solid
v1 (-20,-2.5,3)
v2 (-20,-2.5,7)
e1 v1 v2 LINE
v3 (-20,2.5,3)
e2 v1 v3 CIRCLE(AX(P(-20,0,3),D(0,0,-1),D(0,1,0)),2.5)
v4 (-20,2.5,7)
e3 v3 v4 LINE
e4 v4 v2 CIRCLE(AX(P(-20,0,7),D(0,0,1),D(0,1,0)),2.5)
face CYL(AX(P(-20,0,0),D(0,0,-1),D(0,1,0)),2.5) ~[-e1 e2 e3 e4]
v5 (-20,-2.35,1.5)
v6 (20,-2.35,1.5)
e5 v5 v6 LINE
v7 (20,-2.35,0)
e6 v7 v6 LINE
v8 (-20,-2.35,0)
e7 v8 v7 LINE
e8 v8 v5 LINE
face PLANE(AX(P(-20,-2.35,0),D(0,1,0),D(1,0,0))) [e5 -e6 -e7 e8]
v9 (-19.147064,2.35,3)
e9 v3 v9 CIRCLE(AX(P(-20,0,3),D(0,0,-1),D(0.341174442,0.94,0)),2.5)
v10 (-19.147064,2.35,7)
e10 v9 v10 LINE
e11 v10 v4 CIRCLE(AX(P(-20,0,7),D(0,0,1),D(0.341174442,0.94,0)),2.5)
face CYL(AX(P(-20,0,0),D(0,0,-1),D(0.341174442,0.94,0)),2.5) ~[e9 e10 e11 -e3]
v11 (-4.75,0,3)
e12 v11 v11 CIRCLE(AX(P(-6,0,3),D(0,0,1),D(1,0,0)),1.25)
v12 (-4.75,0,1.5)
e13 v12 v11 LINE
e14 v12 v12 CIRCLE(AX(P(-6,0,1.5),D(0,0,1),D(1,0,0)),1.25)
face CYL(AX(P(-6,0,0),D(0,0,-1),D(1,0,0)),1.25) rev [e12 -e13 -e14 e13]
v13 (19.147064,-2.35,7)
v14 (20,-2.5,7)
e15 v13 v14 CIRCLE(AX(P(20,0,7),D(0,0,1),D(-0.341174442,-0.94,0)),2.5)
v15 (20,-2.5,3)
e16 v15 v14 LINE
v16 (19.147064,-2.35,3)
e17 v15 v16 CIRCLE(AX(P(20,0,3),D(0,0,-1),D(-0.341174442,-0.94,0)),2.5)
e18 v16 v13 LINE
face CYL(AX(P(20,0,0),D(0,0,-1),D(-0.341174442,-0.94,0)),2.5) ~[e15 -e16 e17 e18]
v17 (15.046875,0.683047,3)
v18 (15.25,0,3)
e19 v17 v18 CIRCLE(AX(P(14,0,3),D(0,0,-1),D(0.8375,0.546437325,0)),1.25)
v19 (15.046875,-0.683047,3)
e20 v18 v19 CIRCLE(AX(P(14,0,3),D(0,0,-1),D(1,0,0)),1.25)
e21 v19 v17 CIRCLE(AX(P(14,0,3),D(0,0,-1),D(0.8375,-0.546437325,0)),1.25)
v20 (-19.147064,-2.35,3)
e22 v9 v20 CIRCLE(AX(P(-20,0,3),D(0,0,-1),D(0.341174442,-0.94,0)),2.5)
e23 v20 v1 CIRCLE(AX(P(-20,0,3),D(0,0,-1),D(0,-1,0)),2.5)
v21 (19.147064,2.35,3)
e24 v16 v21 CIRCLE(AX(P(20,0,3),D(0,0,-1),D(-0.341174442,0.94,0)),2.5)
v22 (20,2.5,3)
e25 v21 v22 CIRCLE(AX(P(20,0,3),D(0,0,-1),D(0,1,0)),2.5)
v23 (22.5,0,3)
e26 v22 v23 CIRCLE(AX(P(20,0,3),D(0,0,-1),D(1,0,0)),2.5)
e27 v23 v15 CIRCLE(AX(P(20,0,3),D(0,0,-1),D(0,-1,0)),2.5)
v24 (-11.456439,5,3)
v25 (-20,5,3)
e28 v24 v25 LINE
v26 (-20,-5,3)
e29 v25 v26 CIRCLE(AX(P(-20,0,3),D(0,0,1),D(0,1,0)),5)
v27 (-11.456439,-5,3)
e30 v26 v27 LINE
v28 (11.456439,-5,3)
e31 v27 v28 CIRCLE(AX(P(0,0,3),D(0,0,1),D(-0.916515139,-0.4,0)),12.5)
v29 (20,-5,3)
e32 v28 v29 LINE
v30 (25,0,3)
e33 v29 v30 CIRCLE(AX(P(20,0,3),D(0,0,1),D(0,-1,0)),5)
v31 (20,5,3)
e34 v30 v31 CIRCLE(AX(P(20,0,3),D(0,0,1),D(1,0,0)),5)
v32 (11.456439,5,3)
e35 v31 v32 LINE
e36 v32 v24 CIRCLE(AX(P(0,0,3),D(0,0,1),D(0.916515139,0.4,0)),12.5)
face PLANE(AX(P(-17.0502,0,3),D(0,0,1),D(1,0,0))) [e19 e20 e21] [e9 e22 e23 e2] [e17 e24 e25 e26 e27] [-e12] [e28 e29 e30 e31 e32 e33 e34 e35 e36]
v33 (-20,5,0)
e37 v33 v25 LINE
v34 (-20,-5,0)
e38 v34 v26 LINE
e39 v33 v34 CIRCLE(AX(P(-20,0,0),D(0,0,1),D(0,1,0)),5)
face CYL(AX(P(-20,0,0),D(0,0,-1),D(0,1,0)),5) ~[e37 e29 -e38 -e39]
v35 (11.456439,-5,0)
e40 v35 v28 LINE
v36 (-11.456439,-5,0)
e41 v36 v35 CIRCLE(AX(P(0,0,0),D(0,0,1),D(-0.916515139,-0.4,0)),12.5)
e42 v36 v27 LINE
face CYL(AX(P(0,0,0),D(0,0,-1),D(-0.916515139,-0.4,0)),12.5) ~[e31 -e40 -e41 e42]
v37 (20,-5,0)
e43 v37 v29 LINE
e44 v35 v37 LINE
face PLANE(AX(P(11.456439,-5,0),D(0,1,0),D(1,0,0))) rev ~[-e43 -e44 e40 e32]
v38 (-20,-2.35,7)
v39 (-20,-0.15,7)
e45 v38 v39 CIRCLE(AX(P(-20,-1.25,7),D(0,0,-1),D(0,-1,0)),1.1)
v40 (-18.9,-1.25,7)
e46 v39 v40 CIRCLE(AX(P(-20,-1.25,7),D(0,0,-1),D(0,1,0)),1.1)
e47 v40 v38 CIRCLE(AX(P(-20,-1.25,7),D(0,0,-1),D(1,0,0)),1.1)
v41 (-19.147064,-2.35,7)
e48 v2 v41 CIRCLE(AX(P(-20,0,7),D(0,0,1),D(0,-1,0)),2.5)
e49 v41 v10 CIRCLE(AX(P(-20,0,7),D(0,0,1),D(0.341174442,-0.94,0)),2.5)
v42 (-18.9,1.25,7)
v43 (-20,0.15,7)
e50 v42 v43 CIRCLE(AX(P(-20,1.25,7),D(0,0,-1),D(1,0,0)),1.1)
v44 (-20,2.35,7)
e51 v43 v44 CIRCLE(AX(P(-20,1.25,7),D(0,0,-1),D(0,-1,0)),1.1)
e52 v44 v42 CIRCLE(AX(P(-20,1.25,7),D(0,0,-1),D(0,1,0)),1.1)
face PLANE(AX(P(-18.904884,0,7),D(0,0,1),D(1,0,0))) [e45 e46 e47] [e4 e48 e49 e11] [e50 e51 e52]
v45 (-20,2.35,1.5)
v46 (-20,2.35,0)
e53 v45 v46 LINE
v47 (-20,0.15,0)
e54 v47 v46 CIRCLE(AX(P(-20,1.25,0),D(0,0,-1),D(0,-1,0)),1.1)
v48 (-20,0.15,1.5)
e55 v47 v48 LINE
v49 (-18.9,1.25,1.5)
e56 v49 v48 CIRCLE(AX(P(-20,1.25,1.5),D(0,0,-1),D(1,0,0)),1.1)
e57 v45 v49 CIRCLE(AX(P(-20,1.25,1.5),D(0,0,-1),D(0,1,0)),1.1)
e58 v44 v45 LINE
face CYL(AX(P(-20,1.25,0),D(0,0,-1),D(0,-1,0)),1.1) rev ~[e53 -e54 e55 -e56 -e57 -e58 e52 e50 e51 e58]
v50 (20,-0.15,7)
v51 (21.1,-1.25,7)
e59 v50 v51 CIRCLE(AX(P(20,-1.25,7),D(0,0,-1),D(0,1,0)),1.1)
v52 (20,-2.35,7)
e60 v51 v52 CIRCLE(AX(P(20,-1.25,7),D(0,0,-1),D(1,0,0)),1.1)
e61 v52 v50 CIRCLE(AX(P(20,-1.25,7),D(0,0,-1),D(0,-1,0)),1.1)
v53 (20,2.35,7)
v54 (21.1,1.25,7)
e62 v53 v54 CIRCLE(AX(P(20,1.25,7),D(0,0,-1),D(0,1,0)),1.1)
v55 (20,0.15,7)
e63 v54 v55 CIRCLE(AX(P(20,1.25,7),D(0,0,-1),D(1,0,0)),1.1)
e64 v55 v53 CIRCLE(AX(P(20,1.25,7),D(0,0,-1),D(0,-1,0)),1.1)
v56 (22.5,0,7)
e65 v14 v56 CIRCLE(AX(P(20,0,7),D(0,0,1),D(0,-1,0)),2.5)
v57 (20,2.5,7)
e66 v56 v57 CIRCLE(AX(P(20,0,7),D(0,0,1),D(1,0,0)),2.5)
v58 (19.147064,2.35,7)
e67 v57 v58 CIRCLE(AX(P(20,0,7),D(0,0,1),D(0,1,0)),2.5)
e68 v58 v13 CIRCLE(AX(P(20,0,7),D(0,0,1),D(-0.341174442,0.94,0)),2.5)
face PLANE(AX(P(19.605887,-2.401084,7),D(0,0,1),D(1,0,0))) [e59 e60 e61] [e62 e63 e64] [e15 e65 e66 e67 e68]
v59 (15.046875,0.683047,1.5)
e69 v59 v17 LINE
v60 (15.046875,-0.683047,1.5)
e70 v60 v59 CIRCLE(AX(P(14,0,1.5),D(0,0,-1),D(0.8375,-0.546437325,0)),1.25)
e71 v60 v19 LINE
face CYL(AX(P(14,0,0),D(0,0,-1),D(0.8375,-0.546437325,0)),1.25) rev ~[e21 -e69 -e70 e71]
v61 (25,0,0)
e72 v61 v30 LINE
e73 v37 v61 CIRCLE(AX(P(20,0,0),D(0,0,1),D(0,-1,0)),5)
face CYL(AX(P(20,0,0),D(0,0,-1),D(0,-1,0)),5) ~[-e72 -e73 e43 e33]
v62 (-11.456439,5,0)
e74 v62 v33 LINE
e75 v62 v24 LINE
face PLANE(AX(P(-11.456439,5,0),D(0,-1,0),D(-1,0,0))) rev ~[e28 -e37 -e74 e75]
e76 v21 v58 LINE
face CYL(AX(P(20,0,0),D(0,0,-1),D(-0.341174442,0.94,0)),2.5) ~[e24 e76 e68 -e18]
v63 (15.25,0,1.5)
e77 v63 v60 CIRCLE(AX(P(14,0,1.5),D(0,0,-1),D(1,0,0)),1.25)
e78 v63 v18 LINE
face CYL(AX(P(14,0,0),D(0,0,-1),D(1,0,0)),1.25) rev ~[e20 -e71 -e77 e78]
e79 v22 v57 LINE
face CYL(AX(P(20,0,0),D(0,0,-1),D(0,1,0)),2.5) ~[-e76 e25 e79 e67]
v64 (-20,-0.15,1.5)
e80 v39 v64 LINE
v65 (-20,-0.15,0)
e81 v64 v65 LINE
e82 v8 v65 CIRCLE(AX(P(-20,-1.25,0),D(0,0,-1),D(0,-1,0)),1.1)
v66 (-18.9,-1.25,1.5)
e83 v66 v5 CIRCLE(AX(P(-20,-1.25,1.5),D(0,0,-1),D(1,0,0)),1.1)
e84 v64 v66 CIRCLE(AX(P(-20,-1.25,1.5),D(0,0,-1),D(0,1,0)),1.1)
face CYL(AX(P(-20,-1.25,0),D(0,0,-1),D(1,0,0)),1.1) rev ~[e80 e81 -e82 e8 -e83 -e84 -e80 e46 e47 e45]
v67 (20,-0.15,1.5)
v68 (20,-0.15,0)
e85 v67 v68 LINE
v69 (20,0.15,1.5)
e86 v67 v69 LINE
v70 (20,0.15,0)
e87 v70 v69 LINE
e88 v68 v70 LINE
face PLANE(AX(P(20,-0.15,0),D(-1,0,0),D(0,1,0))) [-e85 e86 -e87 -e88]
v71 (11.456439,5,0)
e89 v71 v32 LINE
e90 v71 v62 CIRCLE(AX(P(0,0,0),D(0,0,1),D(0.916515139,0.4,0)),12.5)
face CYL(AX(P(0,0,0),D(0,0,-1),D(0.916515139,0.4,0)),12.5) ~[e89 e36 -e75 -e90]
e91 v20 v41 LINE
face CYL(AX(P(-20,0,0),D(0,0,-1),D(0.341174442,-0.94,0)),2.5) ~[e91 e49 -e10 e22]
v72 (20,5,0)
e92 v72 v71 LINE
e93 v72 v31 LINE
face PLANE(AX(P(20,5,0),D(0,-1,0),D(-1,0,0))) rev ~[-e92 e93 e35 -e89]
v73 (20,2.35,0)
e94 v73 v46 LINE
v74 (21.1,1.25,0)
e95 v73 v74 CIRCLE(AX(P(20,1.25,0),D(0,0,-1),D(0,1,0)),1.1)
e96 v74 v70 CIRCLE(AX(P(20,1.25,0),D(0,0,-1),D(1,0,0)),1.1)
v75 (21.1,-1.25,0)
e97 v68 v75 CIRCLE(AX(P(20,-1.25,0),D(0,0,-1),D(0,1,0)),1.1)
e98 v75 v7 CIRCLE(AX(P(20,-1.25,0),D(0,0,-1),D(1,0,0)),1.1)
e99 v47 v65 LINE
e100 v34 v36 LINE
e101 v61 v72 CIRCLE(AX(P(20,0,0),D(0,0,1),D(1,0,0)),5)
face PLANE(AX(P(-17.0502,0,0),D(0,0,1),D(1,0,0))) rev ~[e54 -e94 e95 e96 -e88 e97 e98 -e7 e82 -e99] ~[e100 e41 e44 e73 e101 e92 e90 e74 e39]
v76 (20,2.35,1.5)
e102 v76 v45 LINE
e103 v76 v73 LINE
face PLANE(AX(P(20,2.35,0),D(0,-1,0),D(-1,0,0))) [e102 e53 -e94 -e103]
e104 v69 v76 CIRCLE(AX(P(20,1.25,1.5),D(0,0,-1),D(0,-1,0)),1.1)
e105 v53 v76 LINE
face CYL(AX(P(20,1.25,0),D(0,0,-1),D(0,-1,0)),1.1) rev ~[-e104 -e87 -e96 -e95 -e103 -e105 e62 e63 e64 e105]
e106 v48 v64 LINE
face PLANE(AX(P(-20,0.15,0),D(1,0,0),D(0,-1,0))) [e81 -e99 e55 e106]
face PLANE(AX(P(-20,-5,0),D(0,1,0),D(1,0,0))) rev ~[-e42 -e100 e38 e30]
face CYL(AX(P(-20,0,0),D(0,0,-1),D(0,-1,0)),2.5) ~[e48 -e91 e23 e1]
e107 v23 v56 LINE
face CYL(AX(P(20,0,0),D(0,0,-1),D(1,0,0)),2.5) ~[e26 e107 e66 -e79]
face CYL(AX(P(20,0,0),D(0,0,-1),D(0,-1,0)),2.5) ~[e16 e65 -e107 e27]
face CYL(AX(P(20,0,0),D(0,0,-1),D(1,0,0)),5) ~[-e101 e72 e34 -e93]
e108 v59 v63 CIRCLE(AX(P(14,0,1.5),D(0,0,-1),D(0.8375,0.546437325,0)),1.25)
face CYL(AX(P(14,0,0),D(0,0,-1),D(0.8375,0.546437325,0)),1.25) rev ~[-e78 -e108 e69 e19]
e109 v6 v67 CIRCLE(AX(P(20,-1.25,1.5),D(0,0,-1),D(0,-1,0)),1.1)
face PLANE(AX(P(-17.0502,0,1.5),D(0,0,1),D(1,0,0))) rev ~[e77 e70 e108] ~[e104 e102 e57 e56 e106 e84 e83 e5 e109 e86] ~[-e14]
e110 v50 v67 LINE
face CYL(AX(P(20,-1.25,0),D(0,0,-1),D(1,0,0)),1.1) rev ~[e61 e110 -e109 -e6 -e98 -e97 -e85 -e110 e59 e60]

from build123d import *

# Parameters (mm, degrees)
F0_R     = 1.25
F1_DEPTH = 3
F2_DEPTH = 7
F3_DEPTH = 1.5


# Not quite as in the source:
# - a feature names something its author has since deleted; it is built from what else it names


with BuildPart() as f1:
    # F0 (on Top) → F1 (new body)
    with BuildSketch(Plane.XY):
        with BuildLine():
            ThreePointArc((-15, 0), (-15.1488836144, 1.2110614409), (-15.5866679255, 2.35))
            Line((-15.5866679255, 2.35), (-19.1470638945, 2.35))
            ThreePointArc((-19.1470638945, 2.35), (-17.9527652475, 1.4348623168), (-17.5, 0))
            ThreePointArc((-17.5, 0), (-17.9527652475, -1.4348623168), (-19.1470638945, -2.35))
            Line((-19.1470638945, -2.35), (-15.5866679255, -2.35))
            ThreePointArc((-15.5866679255, -2.35), (-15.1488836144, -1.2110614409), (-15, 0))
        make_face()
        with BuildLine():
            Line((-20, -2.5), (-20, -5))
            ThreePointArc((-20, -5), (-17.4260924648, -4.2866070499), (-15.5866679255, -2.35))
            Line((-15.5866679255, -2.35), (-19.1470638945, -2.35))
            ThreePointArc((-19.1470638945, -2.35), (-19.5669872981, -2.4622144504), (-20, -2.5))
        make_face()
        with BuildLine():
            ThreePointArc((-15.5866679255, 2.35), (-17.4260924648, 4.2866070499), (-20, 5))
            Line((-20, 5), (-20, 2.5))
            ThreePointArc((-20, 2.5), (-19.5669872981, 2.4622144504), (-19.1470638945, 2.35))
            Line((-19.1470638945, 2.35), (-15.5866679255, 2.35))
        make_face()
        with BuildLine():
            Line((-20, 2.35), (-20, 2.5))
            ThreePointArc((-20, 2.5), (-22.5, 0), (-20, -2.5))
            Line((-20, -2.5), (-20, -2.35))
            ThreePointArc((-20, -2.35), (-21.1, -1.25), (-20, -0.15))
            Line((-20, -0.15), (-20, 0.15))
            ThreePointArc((-20, 0.15), (-21.1, 1.25), (-20, 2.35))
        make_face()
        with BuildLine():
            ThreePointArc((-12.2771128528, 2.35), (-11.9405191974, 3.6978373809), (-11.4564392374, 5))
            Line((-11.4564392374, 5), (-20, 5))
            ThreePointArc((-20, 5), (-17.4260924648, 4.2866070499), (-15.5866679255, 2.35))
            Line((-15.5866679255, 2.35), (-12.2771128528, 2.35))
        make_face()
        with BuildLine():
            ThreePointArc((-11.4564392374, -5), (-11.9405191974, -3.6978373809), (-12.2771128528, -2.35))
            Line((-12.2771128528, -2.35), (-15.5866679255, -2.35))
            ThreePointArc((-15.5866679255, -2.35), (-17.4260924648, -4.2866070499), (-20, -5))
            Line((-20, -5), (-11.4564392374, -5))
        make_face()
        with BuildLine():
            ThreePointArc((-12.2771128528, -2.35), (-12.5, 0), (-12.2771128528, 2.35))
            Line((-12.2771128528, 2.35), (-15.5866679255, 2.35))
            ThreePointArc((-15.5866679255, 2.35), (-15.1488836144, 1.2110614409), (-15, 0))
            ThreePointArc((-15, 0), (-15.1488836144, -1.2110614409), (-15.5866679255, -2.35))
            Line((-15.5866679255, -2.35), (-12.2771128528, -2.35))
        make_face()
        with BuildLine():
            Line((-11.4564392374, 2.35), (-11.4564392374, 5))
            ThreePointArc((-11.4564392374, 5), (-11.9405191974, 3.6978373809), (-12.2771128528, 2.35))
            Line((-12.2771128528, 2.35), (-11.4564392374, 2.35))
        make_face()
        with BuildLine():
            Line((-11.4564392374, 2.35), (-12.2771128528, 2.35))
            ThreePointArc((-12.2771128528, 2.35), (-12.5, 0), (-12.2771128528, -2.35))
            Line((-12.2771128528, -2.35), (-11.4564392374, -2.35))
            Line((-11.4564392374, -2.35), (-11.4564392374, -1))
            ThreePointArc((-11.4564392374, -1), (-11.5, 0), (-11.4564392374, 1))
            Line((-11.4564392374, 1), (-11.4564392374, 2.35))
        make_face()
        with BuildLine():
            Line((-11.4564392374, -2.35), (-12.2771128528, -2.35))
            ThreePointArc((-12.2771128528, -2.35), (-11.9405191974, -3.6978373809), (-11.4564392374, -5))
            Line((-11.4564392374, -5), (-11.4564392374, -2.35))
        make_face()
        with BuildLine():
            Line((-11.2573309448, 2.35), (-11.4564392374, 2.35))
            Line((-11.4564392374, 2.35), (-11.4564392374, 1))
            ThreePointArc((-11.4564392374, 1), (-11.3769268246, 1.6779559077), (-11.2573309448, 2.35))
        make_face()
        with BuildLine():
            Line((-11.4564392374, -1), (-11.4564392374, -2.35))
            Line((-11.4564392374, -2.35), (-11.2573309448, -2.35))
            ThreePointArc((-11.2573309448, -2.35), (-11.3769268246, -1.6779559077), (-11.4564392374, -1))
        make_face()
        with BuildLine():
            Line((-11.4564392374, -2.35), (-11.4564392374, -5))
            ThreePointArc((-11.4564392374, -5), (0, -12.5), (11.4564392374, -5))
            Line((11.4564392374, -5), (11.4564392374, -2.35))
            Line((11.4564392374, -2.35), (11.2573309448, -2.35))
            ThreePointArc((11.2573309448, -2.35), (0, -11.5), (-11.2573309448, -2.35))
            Line((-11.2573309448, -2.35), (-11.4564392374, -2.35))
        make_face()
        with BuildLine():
            Line((11.4564392374, 2.35), (11.4564392374, 5))
            ThreePointArc((11.4564392374, 5), (0, 12.5), (-11.4564392374, 5))
            Line((-11.4564392374, 5), (-11.4564392374, 2.35))
            Line((-11.4564392374, 2.35), (-11.2573309448, 2.35))
            ThreePointArc((-11.2573309448, 2.35), (0, 11.5), (11.2573309448, 2.35))
            Line((11.2573309448, 2.35), (11.4564392374, 2.35))
        make_face()
        with BuildLine():
            Line((-11.2573309448, 2.35), (11.2573309448, 2.35))
            ThreePointArc((11.2573309448, 2.35), (0, 11.5), (-11.2573309448, 2.35))
        make_face()
        with BuildLine():
            ThreePointArc((-11.2573309448, -2.35), (0, -11.5), (11.2573309448, -2.35))
            Line((11.2573309448, -2.35), (-11.2573309448, -2.35))
        make_face()
        with BuildLine():
            Line((11.4564392374, -1), (11.4564392374, 1))
            ThreePointArc((11.4564392374, 1), (11.3769268246, 1.6779559077), (11.2573309448, 2.35))
            Line((11.2573309448, 2.35), (-11.2573309448, 2.35))
            ThreePointArc((-11.2573309448, 2.35), (-11.3769268246, 1.6779559077), (-11.4564392374, 1))
            Line((-11.4564392374, 1), (-11.4564392374, -1))
            ThreePointArc((-11.4564392374, -1), (-11.3769268246, -1.6779559077), (-11.2573309448, -2.35))
            Line((-11.2573309448, -2.35), (11.2573309448, -2.35))
            ThreePointArc((11.2573309448, -2.35), (11.3769268246, -1.6779559077), (11.4564392374, -1))
        make_face()
        with Locations((-6, 0)):
            Circle(F0_R, mode=Mode.SUBTRACT)
        with BuildLine():
            Line((11.4564392374, 1), (11.4564392374, 2.35))
            Line((11.4564392374, 2.35), (11.2573309448, 2.35))
            ThreePointArc((11.2573309448, 2.35), (11.3769268246, 1.6779559077), (11.4564392374, 1))
        make_face()
        with BuildLine():
            Line((11.4564392374, -2.35), (11.4564392374, -1))
            ThreePointArc((11.4564392374, -1), (11.3769268246, -1.6779559077), (11.2573309448, -2.35))
            Line((11.2573309448, -2.35), (11.4564392374, -2.35))
        make_face()
        with BuildLine():
            ThreePointArc((11.4564392374, -5), (11.9405191974, -3.6978373809), (12.2771128528, -2.35))
            Line((12.2771128528, -2.35), (11.4564392374, -2.35))
            Line((11.4564392374, -2.35), (11.4564392374, -5))
        make_face()
        with BuildLine():
            ThreePointArc((12.2771128528, 2.35), (11.9405191974, 3.6978373809), (11.4564392374, 5))
            Line((11.4564392374, 5), (11.4564392374, 2.35))
            Line((11.4564392374, 2.35), (12.2771128528, 2.35))
        make_face()
        with BuildLine():
            ThreePointArc((12.5, 0), (12.4441534598, 1.1802731337), (12.2771128528, 2.35))
            Line((12.2771128528, 2.35), (11.4564392374, 2.35))
            Line((11.4564392374, 2.35), (11.4564392374, 1))
            ThreePointArc((11.4564392374, 1), (11.4891046481, 0.5004741602), (11.5, 0))
            ThreePointArc((11.5, 0), (11.4891046481, -0.5004741602), (11.4564392374, -1))
            Line((11.4564392374, -1), (11.4564392374, -2.35))
            Line((11.4564392374, -2.35), (12.2771128528, -2.35))
            ThreePointArc((12.2771128528, -2.35), (12.4441534598, -1.1802731337), (12.5, 0))
        make_face()
        with BuildLine():
            Line((20, 5), (11.4564392374, 5))
            ThreePointArc((11.4564392374, 5), (11.9405191974, 3.6978373809), (12.2771128528, 2.35))
            Line((12.2771128528, 2.35), (15.5866679255, 2.35))
            ThreePointArc((15.5866679255, 2.35), (17.4260924648, 4.2866070499), (20, 5))
        make_face()
        with BuildLine():
            Line((15.5866679255, -2.35), (12.2771128528, -2.35))
            ThreePointArc((12.2771128528, -2.35), (11.9405191974, -3.6978373809), (11.4564392374, -5))
            Line((11.4564392374, -5), (20, -5))
            ThreePointArc((20, -5), (17.4260924648, -4.2866070499), (15.5866679255, -2.35))
        make_face()
        with BuildLine():
            Line((15.5866679255, 2.35), (12.2771128528, 2.35))
            ThreePointArc((12.2771128528, 2.35), (12.4441534598, 1.1802731337), (12.5, 0))
            ThreePointArc((12.5, 0), (12.4441534598, -1.1802731337), (12.2771128528, -2.35))
            Line((12.2771128528, -2.35), (15.5866679255, -2.35))
            ThreePointArc((15.5866679255, -2.35), (15.2431824825, -1.5403529158), (15.046875, -0.6830466561))
            ThreePointArc((15.046875, -0.6830466561), (12.75, 0), (15.046875, 0.6830466561))
            ThreePointArc((15.046875, 0.6830466561), (15.2431824825, 1.5403529158), (15.5866679255, 2.35))
        make_face()
        with BuildLine():
            Line((19.1470638945, 2.35), (15.5866679255, 2.35))
            ThreePointArc((15.5866679255, 2.35), (15.2431824825, 1.5403529158), (15.046875, 0.6830466561))
            ThreePointArc((15.046875, 0.6830466561), (15.1981430945, 0.3563048203), (15.25, 0))
            ThreePointArc((15.25, 0), (15.1981430945, -0.3563048203), (15.046875, -0.6830466561))
            ThreePointArc((15.046875, -0.6830466561), (15.2431824825, -1.5403529158), (15.5866679255, -2.35))
            Line((15.5866679255, -2.35), (19.1470638945, -2.35))
            ThreePointArc((19.1470638945, -2.35), (17.5, 0), (19.1470638945, 2.35))
        make_face()
        with BuildLine():
            Line((20, 2.5), (20, 5))
            ThreePointArc((20, 5), (17.4260924648, 4.2866070499), (15.5866679255, 2.35))
            Line((15.5866679255, 2.35), (19.1470638945, 2.35))
            ThreePointArc((19.1470638945, 2.35), (19.5669872981, 2.4622144504), (20, 2.5))
        make_face()
        with BuildLine():
            ThreePointArc((22.5, 0), (21.767766953, 1.767766953), (20, 2.5))
            Line((20, 2.5), (20, 2.35))
            ThreePointArc((20, 2.35), (20.7778174593, 2.0278174593), (21.1, 1.25))
            ThreePointArc((21.1, 1.25), (20.7778174593, 0.4721825407), (20, 0.15))
            Line((20, 0.15), (20, -0.15))
            ThreePointArc((20, -0.15), (20.7778174593, -0.4721825407), (21.1, -1.25))
            ThreePointArc((21.1, -1.25), (20.7778174593, -2.0278174593), (20, -2.35))
            Line((20, -2.35), (20, -2.5))
            ThreePointArc((20, -2.5), (21.767766953, -1.767766953), (22.5, 0))
        make_face()
        with BuildLine():
            ThreePointArc((15.5866679255, -2.35), (17.4260924648, -4.2866070499), (20, -5))
            Line((20, -5), (20, -2.5))
            ThreePointArc((20, -2.5), (19.5669872981, -2.4622144504), (19.1470638945, -2.35))
            Line((19.1470638945, -2.35), (15.5866679255, -2.35))
        make_face()
        with BuildLine():
            Line((-11.4564392374, -1), (-11.4564392374, 1))
            ThreePointArc((-11.4564392374, 1), (-11.5, 0), (-11.4564392374, -1))
        make_face()
        with BuildLine():
            ThreePointArc((11.5, 0), (11.4891046481, 0.5004741602), (11.4564392374, 1))
            Line((11.4564392374, 1), (11.4564392374, -1))
            ThreePointArc((11.4564392374, -1), (11.4891046481, -0.5004741602), (11.5, 0))
        make_face()
        with BuildLine():
            ThreePointArc((25, 0), (23.5355339059, 3.5355339059), (20, 5))
            Line((20, 5), (20, 2.5))
            ThreePointArc((20, 2.5), (21.767766953, 1.767766953), (22.5, 0))
            ThreePointArc((22.5, 0), (21.767766953, -1.767766953), (20, -2.5))
            Line((20, -2.5), (20, -5))
            ThreePointArc((20, -5), (23.5355339059, -3.5355339059), (25, 0))
        make_face()
        with BuildLine():
            Line((-20, 2.5), (-20, 5))
            ThreePointArc((-20, 5), (-25, 0), (-20, -5))
            Line((-20, -5), (-20, -2.5))
            ThreePointArc((-20, -2.5), (-22.5, 0), (-20, 2.5))
        make_face()
        with BuildLine():
            ThreePointArc((-17.5, 0), (-17.9527652475, 1.4348623168), (-19.1470638945, 2.35))
            Line((-19.1470638945, 2.35), (-20, 2.35))
            ThreePointArc((-20, 2.35), (-19.2221825407, 2.0278174593), (-18.9, 1.25))
            ThreePointArc((-18.9, 1.25), (-19.2221825407, 0.4721825407), (-20, 0.15))
            Line((-20, 0.15), (-20, -0.15))
            ThreePointArc((-20, -0.15), (-19.2221825407, -0.4721825407), (-18.9, -1.25))
            ThreePointArc((-18.9, -1.25), (-19.2221825407, -2.0278174593), (-20, -2.35))
            Line((-20, -2.35), (-19.1470638945, -2.35))
            ThreePointArc((-19.1470638945, -2.35), (-17.9527652475, -1.4348623168), (-17.5, 0))
        make_face()
        with BuildLine():
            Line((-20, -2.35), (-20, -2.5))
            ThreePointArc((-20, -2.5), (-19.5669872981, -2.4622144504), (-19.1470638945, -2.35))
            Line((-19.1470638945, -2.35), (-20, -2.35))
        make_face()
        with BuildLine():
            ThreePointArc((-19.1470638945, 2.35), (-19.5669872981, 2.4622144504), (-20, 2.5))
            Line((-20, 2.5), (-20, 2.35))
            Line((-20, 2.35), (-19.1470638945, 2.35))
        make_face()
        with BuildLine():
            Line((20, 2.35), (19.1470638945, 2.35))
            ThreePointArc((19.1470638945, 2.35), (17.5, 0), (19.1470638945, -2.35))
            Line((19.1470638945, -2.35), (20, -2.35))
            ThreePointArc((20, -2.35), (18.9, -1.25), (20, -0.15))
            Line((20, -0.15), (20, 0.15))
            ThreePointArc((20, 0.15), (18.9, 1.25), (20, 2.35))
        make_face()
        with BuildLine():
            Line((20, 2.35), (20, 2.5))
            ThreePointArc((20, 2.5), (19.5669872981, 2.4622144504), (19.1470638945, 2.35))
            Line((19.1470638945, 2.35), (20, 2.35))
        make_face()
        with BuildLine():
            Line((20, -2.35), (19.1470638945, -2.35))
            ThreePointArc((19.1470638945, -2.35), (19.5669872981, -2.4622144504), (20, -2.5))
            Line((20, -2.5), (20, -2.35))
        make_face()
    extrude(amount=F1_DEPTH)

    # F0 (on Top) → F2 (join)
    with BuildSketch(Plane.XY):
        with BuildLine():
            ThreePointArc((-17.5, 0), (-17.9527652475, 1.4348623168), (-19.1470638945, 2.35))
            Line((-19.1470638945, 2.35), (-20, 2.35))
            ThreePointArc((-20, 2.35), (-19.2221825407, 2.0278174593), (-18.9, 1.25))
            ThreePointArc((-18.9, 1.25), (-19.2221825407, 0.4721825407), (-20, 0.15))
            Line((-20, 0.15), (-20, -0.15))
            ThreePointArc((-20, -0.15), (-19.2221825407, -0.4721825407), (-18.9, -1.25))
            ThreePointArc((-18.9, -1.25), (-19.2221825407, -2.0278174593), (-20, -2.35))
            Line((-20, -2.35), (-19.1470638945, -2.35))
            ThreePointArc((-19.1470638945, -2.35), (-17.9527652475, -1.4348623168), (-17.5, 0))
        make_face()
        with BuildLine():
            Line((-20, -2.35), (-20, -2.5))
            ThreePointArc((-20, -2.5), (-19.5669872981, -2.4622144504), (-19.1470638945, -2.35))
            Line((-19.1470638945, -2.35), (-20, -2.35))
        make_face()
        with BuildLine():
            Line((-20, 2.35), (-20, 2.5))
            ThreePointArc((-20, 2.5), (-22.5, 0), (-20, -2.5))
            Line((-20, -2.5), (-20, -2.35))
            ThreePointArc((-20, -2.35), (-21.1, -1.25), (-20, -0.15))
            Line((-20, -0.15), (-20, 0.15))
            ThreePointArc((-20, 0.15), (-21.1, 1.25), (-20, 2.35))
        make_face()
        with BuildLine():
            ThreePointArc((-19.1470638945, 2.35), (-19.5669872981, 2.4622144504), (-20, 2.5))
            Line((-20, 2.5), (-20, 2.35))
            Line((-20, 2.35), (-19.1470638945, 2.35))
        make_face()
        with BuildLine():
            Line((20, -2.35), (19.1470638945, -2.35))
            ThreePointArc((19.1470638945, -2.35), (19.5669872981, -2.4622144504), (20, -2.5))
            Line((20, -2.5), (20, -2.35))
        make_face()
        with BuildLine():
            Line((20, 2.35), (19.1470638945, 2.35))
            ThreePointArc((19.1470638945, 2.35), (17.5, 0), (19.1470638945, -2.35))
            Line((19.1470638945, -2.35), (20, -2.35))
            ThreePointArc((20, -2.35), (18.9, -1.25), (20, -0.15))
            Line((20, -0.15), (20, 0.15))
            ThreePointArc((20, 0.15), (18.9, 1.25), (20, 2.35))
        make_face()
        with BuildLine():
            ThreePointArc((22.5, 0), (21.767766953, 1.767766953), (20, 2.5))
            Line((20, 2.5), (20, 2.35))
            ThreePointArc((20, 2.35), (20.7778174593, 2.0278174593), (21.1, 1.25))
            ThreePointArc((21.1, 1.25), (20.7778174593, 0.4721825407), (20, 0.15))
            Line((20, 0.15), (20, -0.15))
            ThreePointArc((20, -0.15), (20.7778174593, -0.4721825407), (21.1, -1.25))
            ThreePointArc((21.1, -1.25), (20.7778174593, -2.0278174593), (20, -2.35))
            Line((20, -2.35), (20, -2.5))
            ThreePointArc((20, -2.5), (21.767766953, -1.767766953), (22.5, 0))
        make_face()
        with BuildLine():
            Line((20, 2.35), (20, 2.5))
            ThreePointArc((20, 2.5), (19.5669872981, 2.4622144504), (19.1470638945, 2.35))
            Line((19.1470638945, 2.35), (20, 2.35))
        make_face()
    extrude(amount=F2_DEPTH)


with BuildPart() as f3:
    # F0 (on Top) → F3 (new body)
    with BuildSketch(Plane.XY):
        with BuildLine():
            ThreePointArc((-15, 0), (-15.1488836144, 1.2110614409), (-15.5866679255, 2.35))
            Line((-15.5866679255, 2.35), (-19.1470638945, 2.35))
            ThreePointArc((-19.1470638945, 2.35), (-17.9527652475, 1.4348623168), (-17.5, 0))
            ThreePointArc((-17.5, 0), (-17.9527652475, -1.4348623168), (-19.1470638945, -2.35))
            Line((-19.1470638945, -2.35), (-15.5866679255, -2.35))
            ThreePointArc((-15.5866679255, -2.35), (-15.1488836144, -1.2110614409), (-15, 0))
        make_face()
        with BuildLine():
            ThreePointArc((-12.2771128528, -2.35), (-12.5, 0), (-12.2771128528, 2.35))
            Line((-12.2771128528, 2.35), (-15.5866679255, 2.35))
            ThreePointArc((-15.5866679255, 2.35), (-15.1488836144, 1.2110614409), (-15, 0))
            ThreePointArc((-15, 0), (-15.1488836144, -1.2110614409), (-15.5866679255, -2.35))
            Line((-15.5866679255, -2.35), (-12.2771128528, -2.35))
        make_face()
        with BuildLine():
            Line((-11.4564392374, 2.35), (-12.2771128528, 2.35))
            ThreePointArc((-12.2771128528, 2.35), (-12.5, 0), (-12.2771128528, -2.35))
            Line((-12.2771128528, -2.35), (-11.4564392374, -2.35))
            Line((-11.4564392374, -2.35), (-11.4564392374, -1))
            ThreePointArc((-11.4564392374, -1), (-11.5, 0), (-11.4564392374, 1))
            Line((-11.4564392374, 1), (-11.4564392374, 2.35))
        make_face()
        with BuildLine():
            Line((-11.2573309448, 2.35), (-11.4564392374, 2.35))
            Line((-11.4564392374, 2.35), (-11.4564392374, 1))
            ThreePointArc((-11.4564392374, 1), (-11.3769268246, 1.6779559077), (-11.2573309448, 2.35))
        make_face()
        with BuildLine():
            Line((-11.4564392374, -1), (-11.4564392374, -2.35))
            Line((-11.4564392374, -2.35), (-11.2573309448, -2.35))
            ThreePointArc((-11.2573309448, -2.35), (-11.3769268246, -1.6779559077), (-11.4564392374, -1))
        make_face()
        with BuildLine():
            Line((11.4564392374, -1), (11.4564392374, 1))
            ThreePointArc((11.4564392374, 1), (11.3769268246, 1.6779559077), (11.2573309448, 2.35))
            Line((11.2573309448, 2.35), (-11.2573309448, 2.35))
            ThreePointArc((-11.2573309448, 2.35), (-11.3769268246, 1.6779559077), (-11.4564392374, 1))
            Line((-11.4564392374, 1), (-11.4564392374, -1))
            ThreePointArc((-11.4564392374, -1), (-11.3769268246, -1.6779559077), (-11.2573309448, -2.35))
            Line((-11.2573309448, -2.35), (11.2573309448, -2.35))
            ThreePointArc((11.2573309448, -2.35), (11.3769268246, -1.6779559077), (11.4564392374, -1))
        make_face()
        with Locations((-6, 0)):
            Circle(F0_R, mode=Mode.SUBTRACT)
        with BuildLine():
            Line((11.4564392374, 1), (11.4564392374, 2.35))
            Line((11.4564392374, 2.35), (11.2573309448, 2.35))
            ThreePointArc((11.2573309448, 2.35), (11.3769268246, 1.6779559077), (11.4564392374, 1))
        make_face()
        with BuildLine():
            Line((11.4564392374, -2.35), (11.4564392374, -1))
            ThreePointArc((11.4564392374, -1), (11.3769268246, -1.6779559077), (11.2573309448, -2.35))
            Line((11.2573309448, -2.35), (11.4564392374, -2.35))
        make_face()
        with BuildLine():
            ThreePointArc((12.5, 0), (12.4441534598, 1.1802731337), (12.2771128528, 2.35))
            Line((12.2771128528, 2.35), (11.4564392374, 2.35))
            Line((11.4564392374, 2.35), (11.4564392374, 1))
            ThreePointArc((11.4564392374, 1), (11.4891046481, 0.5004741602), (11.5, 0))
            ThreePointArc((11.5, 0), (11.4891046481, -0.5004741602), (11.4564392374, -1))
            Line((11.4564392374, -1), (11.4564392374, -2.35))
            Line((11.4564392374, -2.35), (12.2771128528, -2.35))
            ThreePointArc((12.2771128528, -2.35), (12.4441534598, -1.1802731337), (12.5, 0))
        make_face()
        with BuildLine():
            Line((15.5866679255, 2.35), (12.2771128528, 2.35))
            ThreePointArc((12.2771128528, 2.35), (12.4441534598, 1.1802731337), (12.5, 0))
            ThreePointArc((12.5, 0), (12.4441534598, -1.1802731337), (12.2771128528, -2.35))
            Line((12.2771128528, -2.35), (15.5866679255, -2.35))
            ThreePointArc((15.5866679255, -2.35), (15.2431824825, -1.5403529158), (15.046875, -0.6830466561))
            ThreePointArc((15.046875, -0.6830466561), (12.75, 0), (15.046875, 0.6830466561))
            ThreePointArc((15.046875, 0.6830466561), (15.2431824825, 1.5403529158), (15.5866679255, 2.35))
        make_face()
        with BuildLine():
            Line((19.1470638945, 2.35), (15.5866679255, 2.35))
            ThreePointArc((15.5866679255, 2.35), (15.2431824825, 1.5403529158), (15.046875, 0.6830466561))
            ThreePointArc((15.046875, 0.6830466561), (15.1981430945, 0.3563048203), (15.25, 0))
            ThreePointArc((15.25, 0), (15.1981430945, -0.3563048203), (15.046875, -0.6830466561))
            ThreePointArc((15.046875, -0.6830466561), (15.2431824825, -1.5403529158), (15.5866679255, -2.35))
            Line((15.5866679255, -2.35), (19.1470638945, -2.35))
            ThreePointArc((19.1470638945, -2.35), (17.5, 0), (19.1470638945, 2.35))
        make_face()
        with BuildLine():
            ThreePointArc((11.5, 0), (11.4891046481, 0.5004741602), (11.4564392374, 1))
            Line((11.4564392374, 1), (11.4564392374, -1))
            ThreePointArc((11.4564392374, -1), (11.4891046481, -0.5004741602), (11.5, 0))
        make_face()
        with BuildLine():
            Line((-11.4564392374, -1), (-11.4564392374, 1))
            ThreePointArc((-11.4564392374, 1), (-11.5, 0), (-11.4564392374, -1))
        make_face()
        with BuildLine():
            ThreePointArc((-17.5, 0), (-17.9527652475, 1.4348623168), (-19.1470638945, 2.35))
            Line((-19.1470638945, 2.35), (-20, 2.35))
            ThreePointArc((-20, 2.35), (-19.2221825407, 2.0278174593), (-18.9, 1.25))
            ThreePointArc((-18.9, 1.25), (-19.2221825407, 0.4721825407), (-20, 0.15))
            Line((-20, 0.15), (-20, -0.15))
            ThreePointArc((-20, -0.15), (-19.2221825407, -0.4721825407), (-18.9, -1.25))
            ThreePointArc((-18.9, -1.25), (-19.2221825407, -2.0278174593), (-20, -2.35))
            Line((-20, -2.35), (-19.1470638945, -2.35))
            ThreePointArc((-19.1470638945, -2.35), (-17.9527652475, -1.4348623168), (-17.5, 0))
        make_face()
        with BuildLine():
            Line((20, 2.35), (19.1470638945, 2.35))
            ThreePointArc((19.1470638945, 2.35), (17.5, 0), (19.1470638945, -2.35))
            Line((19.1470638945, -2.35), (20, -2.35))
            ThreePointArc((20, -2.35), (18.9, -1.25), (20, -0.15))
            Line((20, -0.15), (20, 0.15))
            ThreePointArc((20, 0.15), (18.9, 1.25), (20, 2.35))
        make_face()
    extrude(amount=F3_DEPTH)


with BuildPart() as f1_1:
    add(f1.part)

    # F4: cut F3
    add(f3.part, mode=Mode.SUBTRACT)


solid = f1_1.part
